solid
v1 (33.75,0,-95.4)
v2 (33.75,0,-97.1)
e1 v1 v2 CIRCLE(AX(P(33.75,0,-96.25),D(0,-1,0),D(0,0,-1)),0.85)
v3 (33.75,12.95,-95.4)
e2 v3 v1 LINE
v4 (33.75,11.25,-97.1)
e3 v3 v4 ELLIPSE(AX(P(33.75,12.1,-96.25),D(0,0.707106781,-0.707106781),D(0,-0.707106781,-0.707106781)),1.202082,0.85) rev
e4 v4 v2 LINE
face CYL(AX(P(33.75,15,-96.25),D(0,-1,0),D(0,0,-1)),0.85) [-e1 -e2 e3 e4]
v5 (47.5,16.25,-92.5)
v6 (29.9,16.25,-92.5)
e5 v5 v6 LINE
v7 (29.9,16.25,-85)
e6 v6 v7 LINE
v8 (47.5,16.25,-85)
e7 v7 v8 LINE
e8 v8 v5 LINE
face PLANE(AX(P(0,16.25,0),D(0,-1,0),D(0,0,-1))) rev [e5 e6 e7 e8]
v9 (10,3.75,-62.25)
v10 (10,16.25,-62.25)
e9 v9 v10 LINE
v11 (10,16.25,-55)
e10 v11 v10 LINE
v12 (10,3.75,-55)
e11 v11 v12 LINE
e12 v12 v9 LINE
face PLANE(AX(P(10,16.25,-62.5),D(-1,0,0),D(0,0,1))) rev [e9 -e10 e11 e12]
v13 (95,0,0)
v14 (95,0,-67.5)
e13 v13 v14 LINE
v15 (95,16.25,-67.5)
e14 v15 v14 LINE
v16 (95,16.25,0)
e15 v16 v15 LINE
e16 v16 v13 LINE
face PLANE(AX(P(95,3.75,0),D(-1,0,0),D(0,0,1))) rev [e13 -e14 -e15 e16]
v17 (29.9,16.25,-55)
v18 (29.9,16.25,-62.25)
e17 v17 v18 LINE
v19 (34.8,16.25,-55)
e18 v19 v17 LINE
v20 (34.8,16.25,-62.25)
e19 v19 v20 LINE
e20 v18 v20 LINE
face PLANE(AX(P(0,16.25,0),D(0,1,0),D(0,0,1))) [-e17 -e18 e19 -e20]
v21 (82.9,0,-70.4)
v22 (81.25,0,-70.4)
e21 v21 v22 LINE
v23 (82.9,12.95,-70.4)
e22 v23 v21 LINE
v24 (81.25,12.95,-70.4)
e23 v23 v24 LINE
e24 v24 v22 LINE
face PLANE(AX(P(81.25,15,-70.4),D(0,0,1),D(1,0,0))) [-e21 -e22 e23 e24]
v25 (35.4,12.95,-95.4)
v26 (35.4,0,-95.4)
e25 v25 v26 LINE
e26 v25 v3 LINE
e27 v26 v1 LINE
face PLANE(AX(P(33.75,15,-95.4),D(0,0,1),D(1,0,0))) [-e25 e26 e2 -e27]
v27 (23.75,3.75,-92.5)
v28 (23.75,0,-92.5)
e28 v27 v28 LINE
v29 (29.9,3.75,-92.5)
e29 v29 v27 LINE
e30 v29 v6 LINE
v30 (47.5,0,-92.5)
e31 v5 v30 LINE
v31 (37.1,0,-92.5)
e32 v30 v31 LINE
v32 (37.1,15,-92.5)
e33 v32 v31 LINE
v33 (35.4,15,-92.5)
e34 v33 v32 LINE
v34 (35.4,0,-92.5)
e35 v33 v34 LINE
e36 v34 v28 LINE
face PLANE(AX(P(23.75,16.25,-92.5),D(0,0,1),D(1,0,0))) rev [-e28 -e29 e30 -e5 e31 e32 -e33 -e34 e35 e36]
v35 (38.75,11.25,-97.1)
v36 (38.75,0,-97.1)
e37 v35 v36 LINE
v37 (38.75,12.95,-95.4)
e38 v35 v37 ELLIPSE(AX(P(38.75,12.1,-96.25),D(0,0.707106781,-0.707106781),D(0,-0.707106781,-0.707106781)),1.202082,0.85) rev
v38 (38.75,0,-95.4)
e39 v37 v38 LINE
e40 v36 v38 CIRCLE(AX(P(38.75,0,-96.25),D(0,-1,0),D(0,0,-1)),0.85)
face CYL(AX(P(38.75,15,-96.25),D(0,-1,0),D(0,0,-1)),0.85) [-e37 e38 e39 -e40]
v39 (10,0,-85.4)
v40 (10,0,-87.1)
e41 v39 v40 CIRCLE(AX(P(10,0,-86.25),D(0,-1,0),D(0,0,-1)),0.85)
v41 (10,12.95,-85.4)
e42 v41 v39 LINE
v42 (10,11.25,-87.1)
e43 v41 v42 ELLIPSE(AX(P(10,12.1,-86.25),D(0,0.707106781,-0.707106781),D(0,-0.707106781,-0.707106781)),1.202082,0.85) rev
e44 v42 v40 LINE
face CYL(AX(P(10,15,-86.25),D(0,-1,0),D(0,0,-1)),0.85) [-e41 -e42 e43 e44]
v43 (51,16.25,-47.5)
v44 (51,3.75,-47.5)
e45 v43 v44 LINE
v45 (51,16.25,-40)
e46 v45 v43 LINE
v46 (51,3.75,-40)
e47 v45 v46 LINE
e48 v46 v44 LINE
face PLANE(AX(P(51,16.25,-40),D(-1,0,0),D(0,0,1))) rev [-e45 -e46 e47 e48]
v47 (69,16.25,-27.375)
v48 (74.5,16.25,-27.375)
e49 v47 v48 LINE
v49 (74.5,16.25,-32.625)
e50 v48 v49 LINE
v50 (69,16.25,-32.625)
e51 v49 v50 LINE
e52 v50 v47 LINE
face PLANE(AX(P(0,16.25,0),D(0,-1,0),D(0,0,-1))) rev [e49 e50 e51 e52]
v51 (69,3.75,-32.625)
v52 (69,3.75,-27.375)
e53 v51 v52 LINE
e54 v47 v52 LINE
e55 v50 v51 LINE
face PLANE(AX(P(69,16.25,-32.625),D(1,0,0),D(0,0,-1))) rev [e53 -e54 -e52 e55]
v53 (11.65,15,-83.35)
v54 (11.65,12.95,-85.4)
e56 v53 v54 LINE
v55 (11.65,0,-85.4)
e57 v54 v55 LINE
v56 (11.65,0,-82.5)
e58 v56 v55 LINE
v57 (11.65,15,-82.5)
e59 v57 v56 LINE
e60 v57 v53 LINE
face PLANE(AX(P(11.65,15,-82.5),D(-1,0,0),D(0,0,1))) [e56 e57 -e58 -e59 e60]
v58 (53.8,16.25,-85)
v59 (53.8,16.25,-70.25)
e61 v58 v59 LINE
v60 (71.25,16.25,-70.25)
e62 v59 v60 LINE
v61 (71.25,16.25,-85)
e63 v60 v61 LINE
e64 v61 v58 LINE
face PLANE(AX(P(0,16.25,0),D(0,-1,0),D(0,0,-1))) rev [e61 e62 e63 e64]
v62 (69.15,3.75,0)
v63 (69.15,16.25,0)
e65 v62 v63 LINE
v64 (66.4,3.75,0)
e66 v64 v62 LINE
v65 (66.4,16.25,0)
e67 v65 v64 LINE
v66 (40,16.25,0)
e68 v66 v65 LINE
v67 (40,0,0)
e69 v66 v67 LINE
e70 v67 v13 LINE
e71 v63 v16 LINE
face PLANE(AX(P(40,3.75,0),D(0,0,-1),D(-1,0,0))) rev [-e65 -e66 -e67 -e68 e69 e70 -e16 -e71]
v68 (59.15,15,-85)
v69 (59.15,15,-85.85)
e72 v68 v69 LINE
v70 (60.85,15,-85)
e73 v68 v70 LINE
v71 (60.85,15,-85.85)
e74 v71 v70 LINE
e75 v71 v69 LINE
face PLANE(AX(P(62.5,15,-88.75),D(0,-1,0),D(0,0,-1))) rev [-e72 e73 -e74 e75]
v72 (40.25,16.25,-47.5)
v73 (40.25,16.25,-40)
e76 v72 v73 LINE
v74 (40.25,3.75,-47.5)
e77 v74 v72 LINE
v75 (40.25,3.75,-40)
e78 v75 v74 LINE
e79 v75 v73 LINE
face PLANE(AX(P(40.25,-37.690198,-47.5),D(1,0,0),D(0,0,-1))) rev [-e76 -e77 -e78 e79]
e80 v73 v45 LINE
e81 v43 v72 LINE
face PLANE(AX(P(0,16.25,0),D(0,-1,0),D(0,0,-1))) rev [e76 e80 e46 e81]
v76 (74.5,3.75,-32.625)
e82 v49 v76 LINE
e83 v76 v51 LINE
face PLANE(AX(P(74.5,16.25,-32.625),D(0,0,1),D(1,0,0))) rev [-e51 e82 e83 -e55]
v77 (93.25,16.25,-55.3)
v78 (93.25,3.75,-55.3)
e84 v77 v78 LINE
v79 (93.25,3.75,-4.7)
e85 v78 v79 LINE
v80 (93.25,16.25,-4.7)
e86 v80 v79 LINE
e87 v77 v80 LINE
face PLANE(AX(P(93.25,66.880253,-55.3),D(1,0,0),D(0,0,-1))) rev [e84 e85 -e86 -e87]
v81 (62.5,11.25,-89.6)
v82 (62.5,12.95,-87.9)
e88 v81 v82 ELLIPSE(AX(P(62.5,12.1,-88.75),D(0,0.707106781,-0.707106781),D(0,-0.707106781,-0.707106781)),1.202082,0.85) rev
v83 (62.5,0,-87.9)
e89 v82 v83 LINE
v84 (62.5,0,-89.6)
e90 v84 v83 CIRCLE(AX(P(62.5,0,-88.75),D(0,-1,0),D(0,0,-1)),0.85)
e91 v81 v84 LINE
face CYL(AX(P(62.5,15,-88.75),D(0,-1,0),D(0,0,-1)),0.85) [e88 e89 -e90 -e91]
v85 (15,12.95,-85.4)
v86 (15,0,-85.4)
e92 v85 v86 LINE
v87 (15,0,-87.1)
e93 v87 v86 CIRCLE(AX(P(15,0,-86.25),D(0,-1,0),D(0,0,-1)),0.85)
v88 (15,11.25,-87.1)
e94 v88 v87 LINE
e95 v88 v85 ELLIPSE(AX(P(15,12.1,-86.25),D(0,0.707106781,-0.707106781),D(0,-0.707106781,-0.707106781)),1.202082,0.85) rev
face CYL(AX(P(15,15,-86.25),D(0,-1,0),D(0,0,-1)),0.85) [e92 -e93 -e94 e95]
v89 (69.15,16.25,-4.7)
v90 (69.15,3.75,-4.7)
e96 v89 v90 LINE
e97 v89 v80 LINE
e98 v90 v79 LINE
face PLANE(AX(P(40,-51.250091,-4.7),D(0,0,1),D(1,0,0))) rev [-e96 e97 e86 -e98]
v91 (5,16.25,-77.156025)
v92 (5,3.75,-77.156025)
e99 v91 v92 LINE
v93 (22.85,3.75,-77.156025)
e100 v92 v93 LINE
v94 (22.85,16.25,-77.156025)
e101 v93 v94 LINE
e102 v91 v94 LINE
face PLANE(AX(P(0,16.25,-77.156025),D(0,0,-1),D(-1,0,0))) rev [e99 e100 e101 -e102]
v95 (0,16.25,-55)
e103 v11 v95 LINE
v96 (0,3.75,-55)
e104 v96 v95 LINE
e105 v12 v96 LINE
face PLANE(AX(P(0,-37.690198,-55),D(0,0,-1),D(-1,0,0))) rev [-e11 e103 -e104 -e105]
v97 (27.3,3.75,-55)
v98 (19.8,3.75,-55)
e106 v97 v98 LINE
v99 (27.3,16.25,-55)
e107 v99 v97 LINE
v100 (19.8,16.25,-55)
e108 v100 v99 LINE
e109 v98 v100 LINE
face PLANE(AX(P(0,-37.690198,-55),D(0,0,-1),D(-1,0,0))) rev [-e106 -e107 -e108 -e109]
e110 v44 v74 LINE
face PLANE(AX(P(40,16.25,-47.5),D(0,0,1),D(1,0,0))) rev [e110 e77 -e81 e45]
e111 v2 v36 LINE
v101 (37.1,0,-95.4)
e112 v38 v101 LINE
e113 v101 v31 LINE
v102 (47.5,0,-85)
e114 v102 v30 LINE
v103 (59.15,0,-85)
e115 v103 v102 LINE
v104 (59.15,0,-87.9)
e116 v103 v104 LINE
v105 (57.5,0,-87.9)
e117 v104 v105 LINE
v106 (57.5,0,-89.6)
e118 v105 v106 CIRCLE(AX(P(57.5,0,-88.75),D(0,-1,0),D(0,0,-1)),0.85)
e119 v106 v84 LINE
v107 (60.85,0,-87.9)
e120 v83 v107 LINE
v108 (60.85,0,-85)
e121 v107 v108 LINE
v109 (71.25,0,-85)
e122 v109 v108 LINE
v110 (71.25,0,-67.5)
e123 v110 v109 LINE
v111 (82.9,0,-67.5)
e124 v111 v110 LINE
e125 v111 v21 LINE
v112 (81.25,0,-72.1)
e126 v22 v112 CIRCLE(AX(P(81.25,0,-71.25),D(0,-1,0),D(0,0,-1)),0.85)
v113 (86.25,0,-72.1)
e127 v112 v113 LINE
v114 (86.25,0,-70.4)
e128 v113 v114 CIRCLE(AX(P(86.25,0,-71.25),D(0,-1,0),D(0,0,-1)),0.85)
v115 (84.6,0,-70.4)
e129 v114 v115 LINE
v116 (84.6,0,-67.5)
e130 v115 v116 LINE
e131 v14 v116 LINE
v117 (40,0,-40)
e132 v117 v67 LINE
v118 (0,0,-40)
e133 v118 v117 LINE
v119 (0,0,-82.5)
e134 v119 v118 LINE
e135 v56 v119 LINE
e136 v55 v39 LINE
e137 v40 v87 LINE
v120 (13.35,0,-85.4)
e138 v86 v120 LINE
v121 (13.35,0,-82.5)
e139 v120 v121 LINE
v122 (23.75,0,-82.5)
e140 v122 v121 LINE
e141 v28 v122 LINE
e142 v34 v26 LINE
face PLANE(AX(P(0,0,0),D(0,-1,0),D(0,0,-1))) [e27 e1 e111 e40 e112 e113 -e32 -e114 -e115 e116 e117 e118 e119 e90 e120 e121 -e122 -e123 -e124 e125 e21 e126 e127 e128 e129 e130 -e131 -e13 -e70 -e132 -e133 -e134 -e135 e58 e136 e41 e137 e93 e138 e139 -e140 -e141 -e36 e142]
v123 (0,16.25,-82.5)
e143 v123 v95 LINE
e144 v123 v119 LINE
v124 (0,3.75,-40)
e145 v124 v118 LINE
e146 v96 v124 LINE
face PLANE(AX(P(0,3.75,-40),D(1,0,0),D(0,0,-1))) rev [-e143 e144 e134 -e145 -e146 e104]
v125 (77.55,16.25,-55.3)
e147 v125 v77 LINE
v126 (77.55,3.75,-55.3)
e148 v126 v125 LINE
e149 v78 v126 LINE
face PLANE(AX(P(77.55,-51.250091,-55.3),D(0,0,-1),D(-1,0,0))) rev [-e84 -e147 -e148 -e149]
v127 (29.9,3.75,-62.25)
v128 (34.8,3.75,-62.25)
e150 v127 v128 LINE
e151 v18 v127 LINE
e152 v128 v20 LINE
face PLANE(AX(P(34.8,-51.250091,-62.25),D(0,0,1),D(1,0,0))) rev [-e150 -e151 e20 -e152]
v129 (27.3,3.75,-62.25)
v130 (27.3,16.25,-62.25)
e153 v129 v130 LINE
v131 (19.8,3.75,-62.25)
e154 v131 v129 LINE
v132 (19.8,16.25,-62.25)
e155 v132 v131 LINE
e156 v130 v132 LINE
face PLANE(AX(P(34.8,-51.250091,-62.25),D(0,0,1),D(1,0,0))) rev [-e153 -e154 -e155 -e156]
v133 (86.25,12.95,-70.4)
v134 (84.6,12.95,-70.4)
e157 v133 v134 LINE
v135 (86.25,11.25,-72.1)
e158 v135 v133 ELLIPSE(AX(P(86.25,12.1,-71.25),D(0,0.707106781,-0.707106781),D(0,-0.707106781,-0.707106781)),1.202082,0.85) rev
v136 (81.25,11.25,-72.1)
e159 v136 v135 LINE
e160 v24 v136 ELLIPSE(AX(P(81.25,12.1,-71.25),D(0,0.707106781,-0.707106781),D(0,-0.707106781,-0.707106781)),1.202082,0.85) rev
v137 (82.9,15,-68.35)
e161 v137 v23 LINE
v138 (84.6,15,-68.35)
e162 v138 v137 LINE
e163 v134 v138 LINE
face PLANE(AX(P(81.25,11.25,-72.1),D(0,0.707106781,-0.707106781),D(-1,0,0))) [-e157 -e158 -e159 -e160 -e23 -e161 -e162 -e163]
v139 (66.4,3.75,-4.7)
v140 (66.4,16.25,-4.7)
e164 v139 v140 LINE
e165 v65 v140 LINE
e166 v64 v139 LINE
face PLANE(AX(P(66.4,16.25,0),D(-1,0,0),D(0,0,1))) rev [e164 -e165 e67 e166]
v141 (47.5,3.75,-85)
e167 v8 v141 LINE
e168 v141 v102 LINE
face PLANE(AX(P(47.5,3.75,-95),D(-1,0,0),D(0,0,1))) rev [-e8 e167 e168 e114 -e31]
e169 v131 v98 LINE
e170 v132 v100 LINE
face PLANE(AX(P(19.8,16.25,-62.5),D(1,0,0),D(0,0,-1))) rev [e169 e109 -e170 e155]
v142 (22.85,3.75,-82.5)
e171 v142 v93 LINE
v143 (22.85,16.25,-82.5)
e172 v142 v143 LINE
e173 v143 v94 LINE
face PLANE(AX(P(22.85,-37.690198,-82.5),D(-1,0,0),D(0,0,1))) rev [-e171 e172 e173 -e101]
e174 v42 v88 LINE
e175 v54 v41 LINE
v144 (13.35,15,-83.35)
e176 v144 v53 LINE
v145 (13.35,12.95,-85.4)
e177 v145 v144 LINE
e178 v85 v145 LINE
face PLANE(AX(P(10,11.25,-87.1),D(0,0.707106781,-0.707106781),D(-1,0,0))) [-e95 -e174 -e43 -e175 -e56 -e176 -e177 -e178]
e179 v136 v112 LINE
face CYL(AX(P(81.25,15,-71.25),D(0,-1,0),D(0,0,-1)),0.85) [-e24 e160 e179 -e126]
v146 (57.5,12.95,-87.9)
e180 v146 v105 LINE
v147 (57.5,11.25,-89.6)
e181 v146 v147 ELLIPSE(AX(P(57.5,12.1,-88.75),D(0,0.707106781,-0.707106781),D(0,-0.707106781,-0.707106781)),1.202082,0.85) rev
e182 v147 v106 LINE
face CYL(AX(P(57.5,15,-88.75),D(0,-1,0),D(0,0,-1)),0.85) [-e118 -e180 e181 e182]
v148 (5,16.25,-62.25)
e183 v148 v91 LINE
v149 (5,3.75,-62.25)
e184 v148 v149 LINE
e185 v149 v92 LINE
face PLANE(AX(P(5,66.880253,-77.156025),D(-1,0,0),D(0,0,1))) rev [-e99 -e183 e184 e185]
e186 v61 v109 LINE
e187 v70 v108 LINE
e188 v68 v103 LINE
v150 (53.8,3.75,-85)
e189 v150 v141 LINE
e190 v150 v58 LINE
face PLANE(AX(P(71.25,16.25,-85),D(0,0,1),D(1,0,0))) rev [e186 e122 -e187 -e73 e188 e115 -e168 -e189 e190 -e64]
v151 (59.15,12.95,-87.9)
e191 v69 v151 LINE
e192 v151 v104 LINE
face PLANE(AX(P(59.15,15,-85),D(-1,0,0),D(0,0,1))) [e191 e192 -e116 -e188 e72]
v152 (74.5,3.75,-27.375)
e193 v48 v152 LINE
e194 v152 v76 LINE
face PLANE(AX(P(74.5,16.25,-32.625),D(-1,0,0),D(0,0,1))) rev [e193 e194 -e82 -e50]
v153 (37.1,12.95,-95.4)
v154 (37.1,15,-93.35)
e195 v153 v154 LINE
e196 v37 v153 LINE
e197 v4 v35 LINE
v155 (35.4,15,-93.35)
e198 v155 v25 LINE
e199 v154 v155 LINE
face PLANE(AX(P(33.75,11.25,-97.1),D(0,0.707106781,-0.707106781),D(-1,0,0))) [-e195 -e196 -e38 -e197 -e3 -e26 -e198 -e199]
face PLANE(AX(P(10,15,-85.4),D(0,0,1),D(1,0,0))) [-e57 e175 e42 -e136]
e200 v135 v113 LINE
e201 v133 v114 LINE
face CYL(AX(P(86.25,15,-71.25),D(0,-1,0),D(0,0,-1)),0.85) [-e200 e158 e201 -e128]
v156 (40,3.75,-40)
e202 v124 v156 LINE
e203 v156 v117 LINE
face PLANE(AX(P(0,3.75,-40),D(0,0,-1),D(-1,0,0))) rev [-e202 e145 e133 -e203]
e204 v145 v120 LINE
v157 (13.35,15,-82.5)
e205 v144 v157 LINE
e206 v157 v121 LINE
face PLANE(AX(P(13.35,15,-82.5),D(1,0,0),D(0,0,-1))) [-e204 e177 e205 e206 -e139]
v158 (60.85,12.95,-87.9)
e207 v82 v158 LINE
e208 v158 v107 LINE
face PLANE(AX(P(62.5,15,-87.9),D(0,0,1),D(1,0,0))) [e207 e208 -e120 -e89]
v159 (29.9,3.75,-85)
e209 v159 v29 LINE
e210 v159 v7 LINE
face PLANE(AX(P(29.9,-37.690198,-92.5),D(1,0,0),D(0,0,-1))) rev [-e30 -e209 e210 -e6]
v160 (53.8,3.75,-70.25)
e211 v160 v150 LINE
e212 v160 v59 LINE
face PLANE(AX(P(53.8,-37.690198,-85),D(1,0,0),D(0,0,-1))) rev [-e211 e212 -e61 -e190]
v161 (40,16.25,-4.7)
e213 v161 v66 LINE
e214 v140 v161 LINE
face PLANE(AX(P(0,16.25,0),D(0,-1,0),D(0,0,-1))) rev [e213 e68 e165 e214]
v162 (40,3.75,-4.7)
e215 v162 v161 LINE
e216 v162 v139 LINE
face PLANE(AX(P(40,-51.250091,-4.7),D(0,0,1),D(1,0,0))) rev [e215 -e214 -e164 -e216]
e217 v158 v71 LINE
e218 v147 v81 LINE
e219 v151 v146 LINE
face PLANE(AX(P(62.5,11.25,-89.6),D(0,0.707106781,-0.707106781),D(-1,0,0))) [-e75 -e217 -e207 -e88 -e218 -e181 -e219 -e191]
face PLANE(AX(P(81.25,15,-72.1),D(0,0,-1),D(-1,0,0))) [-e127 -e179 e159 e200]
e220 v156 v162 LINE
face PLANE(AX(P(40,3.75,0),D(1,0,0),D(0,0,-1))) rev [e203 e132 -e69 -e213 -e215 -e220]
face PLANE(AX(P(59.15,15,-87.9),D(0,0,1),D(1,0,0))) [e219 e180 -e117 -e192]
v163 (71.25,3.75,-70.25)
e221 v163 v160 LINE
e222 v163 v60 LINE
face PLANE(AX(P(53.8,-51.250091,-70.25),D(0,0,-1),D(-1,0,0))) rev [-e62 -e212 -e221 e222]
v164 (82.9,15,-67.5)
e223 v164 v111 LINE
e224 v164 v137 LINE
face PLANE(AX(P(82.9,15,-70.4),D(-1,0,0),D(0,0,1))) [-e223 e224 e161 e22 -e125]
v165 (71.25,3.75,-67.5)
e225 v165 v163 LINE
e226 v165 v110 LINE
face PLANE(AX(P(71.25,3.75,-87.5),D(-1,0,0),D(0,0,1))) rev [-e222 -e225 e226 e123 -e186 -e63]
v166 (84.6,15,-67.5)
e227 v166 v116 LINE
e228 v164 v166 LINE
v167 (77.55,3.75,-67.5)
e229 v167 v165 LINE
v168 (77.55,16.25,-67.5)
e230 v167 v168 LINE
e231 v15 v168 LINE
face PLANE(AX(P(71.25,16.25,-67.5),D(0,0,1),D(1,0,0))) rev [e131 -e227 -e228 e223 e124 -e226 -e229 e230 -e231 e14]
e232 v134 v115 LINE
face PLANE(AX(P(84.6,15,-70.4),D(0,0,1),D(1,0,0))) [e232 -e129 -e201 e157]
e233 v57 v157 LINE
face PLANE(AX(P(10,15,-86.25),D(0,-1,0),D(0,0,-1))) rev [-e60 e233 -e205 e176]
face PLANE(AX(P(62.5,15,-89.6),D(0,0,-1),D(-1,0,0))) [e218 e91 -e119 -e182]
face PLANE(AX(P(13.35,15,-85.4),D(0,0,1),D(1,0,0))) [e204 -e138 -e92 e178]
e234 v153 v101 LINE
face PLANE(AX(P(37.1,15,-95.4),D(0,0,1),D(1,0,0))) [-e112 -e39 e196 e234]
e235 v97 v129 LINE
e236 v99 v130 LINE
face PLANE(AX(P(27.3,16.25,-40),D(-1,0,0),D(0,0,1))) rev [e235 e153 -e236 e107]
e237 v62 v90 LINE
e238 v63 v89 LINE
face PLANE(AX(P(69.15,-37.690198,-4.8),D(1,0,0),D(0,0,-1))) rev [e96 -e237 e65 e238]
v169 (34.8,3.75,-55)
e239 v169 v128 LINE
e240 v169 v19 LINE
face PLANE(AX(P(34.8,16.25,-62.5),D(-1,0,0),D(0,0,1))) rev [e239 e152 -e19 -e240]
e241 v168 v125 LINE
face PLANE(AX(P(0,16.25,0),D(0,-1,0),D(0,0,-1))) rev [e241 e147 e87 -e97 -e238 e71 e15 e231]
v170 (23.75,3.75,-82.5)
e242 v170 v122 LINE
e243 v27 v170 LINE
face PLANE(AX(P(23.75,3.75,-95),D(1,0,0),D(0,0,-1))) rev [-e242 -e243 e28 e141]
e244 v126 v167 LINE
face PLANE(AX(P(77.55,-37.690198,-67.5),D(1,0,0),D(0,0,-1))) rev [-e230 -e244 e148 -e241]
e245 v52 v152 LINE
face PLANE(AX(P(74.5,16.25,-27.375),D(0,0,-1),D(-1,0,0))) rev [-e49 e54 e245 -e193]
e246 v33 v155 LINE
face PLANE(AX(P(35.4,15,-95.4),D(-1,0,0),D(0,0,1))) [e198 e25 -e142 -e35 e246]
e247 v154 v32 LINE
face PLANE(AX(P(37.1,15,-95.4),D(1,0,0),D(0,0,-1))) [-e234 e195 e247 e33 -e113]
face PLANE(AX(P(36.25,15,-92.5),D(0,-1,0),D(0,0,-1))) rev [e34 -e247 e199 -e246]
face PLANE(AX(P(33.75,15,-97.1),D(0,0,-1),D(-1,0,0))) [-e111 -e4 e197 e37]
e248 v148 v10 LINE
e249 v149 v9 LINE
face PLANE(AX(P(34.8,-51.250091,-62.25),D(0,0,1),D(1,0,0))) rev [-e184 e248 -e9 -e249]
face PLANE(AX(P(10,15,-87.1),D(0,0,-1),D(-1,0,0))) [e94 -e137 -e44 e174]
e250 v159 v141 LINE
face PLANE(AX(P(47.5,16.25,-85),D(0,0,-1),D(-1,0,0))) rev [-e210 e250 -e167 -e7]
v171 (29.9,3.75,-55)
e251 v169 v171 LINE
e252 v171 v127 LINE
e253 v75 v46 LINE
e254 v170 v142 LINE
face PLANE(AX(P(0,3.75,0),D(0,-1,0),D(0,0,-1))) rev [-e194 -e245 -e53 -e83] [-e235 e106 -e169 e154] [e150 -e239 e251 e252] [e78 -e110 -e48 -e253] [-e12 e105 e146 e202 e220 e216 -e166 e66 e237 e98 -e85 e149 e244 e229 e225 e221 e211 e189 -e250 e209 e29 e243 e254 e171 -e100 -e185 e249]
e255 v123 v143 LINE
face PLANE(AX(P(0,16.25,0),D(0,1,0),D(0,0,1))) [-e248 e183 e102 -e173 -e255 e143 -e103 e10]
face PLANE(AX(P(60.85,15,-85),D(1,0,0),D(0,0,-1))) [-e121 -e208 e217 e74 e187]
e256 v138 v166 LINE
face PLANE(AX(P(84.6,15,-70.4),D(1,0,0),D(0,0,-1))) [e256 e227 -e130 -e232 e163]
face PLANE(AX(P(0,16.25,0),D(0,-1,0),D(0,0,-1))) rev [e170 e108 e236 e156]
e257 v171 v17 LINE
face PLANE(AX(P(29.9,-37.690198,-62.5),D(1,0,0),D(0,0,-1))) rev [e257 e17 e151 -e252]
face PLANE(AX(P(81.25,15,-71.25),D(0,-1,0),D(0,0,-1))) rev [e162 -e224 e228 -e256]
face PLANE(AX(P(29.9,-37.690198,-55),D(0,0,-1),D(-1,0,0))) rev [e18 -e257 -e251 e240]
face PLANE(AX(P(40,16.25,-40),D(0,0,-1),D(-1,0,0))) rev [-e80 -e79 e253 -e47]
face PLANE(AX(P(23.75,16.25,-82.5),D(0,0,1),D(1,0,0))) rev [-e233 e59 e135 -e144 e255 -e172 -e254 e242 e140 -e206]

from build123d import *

# Parameters (mm, degrees)
BOSS_EXTRUDE1_DEPTH     = 3.75
SKETCH2_W               = 17.7
SKETCH2_H               = 14.8
SKETCH2_H_2             = 17.5
SKETCH2_W_2             = 7.5
SKETCH2_H_3             = 22.5
SKETCH2_H_4             = 10
SKETCH2_W_3             = 26.4
SKETCH2_H_5             = 4.8
SKETCH2_W_4             = 11
SKETCH2_H_6             = 7.5
SKETCH2_W_5             = 10
SKETCH2_W_6             = 23.1
SKETCH2_H_7             = 7.843975032
SKETCH2_W_7             = 26.1
SKETCH2_W_8             = 5
SKETCH2_W_9             = 5.5
SKETCH2_H_8             = 5.25
BOSS_EXTRUDE2_DEPTH     = 12.5
SKETCH5_W               = 23.75
SKETCH5_H               = 2.5
CUT_EXTRUDE2_DEPTH      = 136.329459099
BOSS_EXTRUDE3_DEPTH     = 15
CHAMFER1_SIZE           = 3.75
CUT_EXTRUDE3_DEPTH      = 137.811814183
CUT_EXTRUDE3_DEPTH_BACK = 12.5
SKETCH7_W               = 0.25
SKETCH7_H               = 5.343975032
SKETCH7_W_2             = 0.1
SKETCH7_H_2             = 7.5
SKETCH7_H_3             = 15
SKETCH7_H_4             = 12.3
SKETCH7_H_5             = 4.8
CUT_EXTRUDE4_DEPTH      = 137.811814183
CUT_EXTRUDE4_DEPTH_BACK = 12.5
SKETCH9_W               = 17.45
SKETCH9_H               = 0.1
SKETCH9_H_2             = 0.25
SKETCH9_W_2             = 34.8
SKETCH9_W_3             = 55
SKETCH10_W              = 1.75
SKETCH10_H              = 50.6
SKETCH10_W_2            = 5
SKETCH10_H_2            = 14.906024968
BOSS_EXTRUDE5_DEPTH     = 12.5


with BuildPart() as part:
    # Sketch1 → Boss-Extrude1 (new body)
    with BuildSketch(Plane(origin=(0, 0, 0), x_dir=(1, 0, 0), z_dir=(0, 1, 0))):
        Polygon((40, 0), (95, 0), (95, 70), (71.25, 70), (71.25, 87.5), (47.5, 87.5), (47.5, 95), (23.75, 95), (23.75, 85), (0, 85), (0, 40), (40, 40), align=None)
    extrude(amount=BOSS_EXTRUDE1_DEPTH)

    # Sketch2 → Boss-Extrude2 (add)
    with BuildSketch(Plane(origin=(0, 3.75, 0), x_dir=(1, 0, 0), z_dir=(0, 1, 0))):
        with Locations((86.15, 62.6)):
            Rectangle(SKETCH2_W, SKETCH2_H)
        with Locations((62.4, 78.75)):
            Rectangle(SKETCH2_W, SKETCH2_H_2)
        with Locations((23.55, 51.25)):
            Rectangle(SKETCH2_W_2, SKETCH2_H_3)
        with Locations((38.65, 90)):
            Rectangle(SKETCH2_W, SKETCH2_H_4)
        with Locations((53.2, 2.4)):
            Rectangle(SKETCH2_W_3, SKETCH2_H_5)
        with Locations((45.5, 43.75)):
            Rectangle(SKETCH2_W_4, SKETCH2_H_6)
        with Locations((5, 51.25)):
            Rectangle(SKETCH2_W_5, SKETCH2_H_3)
        with Locations((11.55, 81.078012484)):
            Rectangle(SKETCH2_W_6, SKETCH2_H_7)
        with Locations((81.95, 2.4)):
            Rectangle(SKETCH2_W_7, SKETCH2_H_5)
        with Locations((32.3, 51.25)):
            Rectangle(SKETCH2_W_8, SKETCH2_H_3)
        with Locations((71.75, 30)):
            Rectangle(SKETCH2_W_9, SKETCH2_H_8)
    extrude(amount=BOSS_EXTRUDE2_DEPTH)

    # Sketch5 → Cut-Extrude2 (cut, through all)
    with BuildSketch(Plane.XZ):
        with Locations((11.875, -83.75)):
            Rectangle(SKETCH5_W, SKETCH5_H)
        with Locations((59.375, -86.25)):
            Rectangle(SKETCH5_W, SKETCH5_H)
        with Locations((35.625, -93.75)):
            Rectangle(SKETCH5_W, SKETCH5_H)
        with Locations((83.125, -68.75)):
            Rectangle(SKETCH5_W, SKETCH5_H)
    extrude(amount=-CUT_EXTRUDE2_DEPTH, mode=Mode.SUBTRACT)

    # Sketch6 → Boss-Extrude3 (add)
    with BuildSketch(Plane.XZ):
        with BuildLine():
            Line((59.15, -87.9), (57.5, -87.9))
            ThreePointArc((57.5, -87.9), (56.65, -88.75), (57.5, -89.6))
            Line((57.5, -89.6), (62.5, -89.6))
            ThreePointArc((62.5, -89.6), (63.35, -88.75), (62.5, -87.9))
            Line((62.5, -87.9), (60.85, -87.9))
            Line((60.85, -87.9), (60.85, -85))
            ThreePointArc((60.85, -85), (60, -84.15), (59.15, -85))
            Line((59.15, -85), (59.15, -87.9))
        make_face()
        with BuildLine():
            Line((37.1, -95.4), (38.75, -95.4))
            ThreePointArc((38.75, -95.4), (39.6, -96.25), (38.75, -97.1))
            Line((38.75, -97.1), (33.75, -97.1))
            ThreePointArc((33.75, -97.1), (32.9, -96.25), (33.75, -95.4))
            Line((33.75, -95.4), (35.4, -95.4))
            Line((35.4, -95.4), (35.4, -92.5))
            ThreePointArc((35.4, -92.5), (36.25, -91.65), (37.1, -92.5))
            Line((37.1, -92.5), (37.1, -95.4))
        make_face()
        with BuildLine():
            Line((13.35, -85.4), (15, -85.4))
            ThreePointArc((15, -85.4), (15.85, -86.25), (15, -87.1))
            Line((15, -87.1), (10, -87.1))
            ThreePointArc((10, -87.1), (9.15, -86.25), (10, -85.4))
            Line((10, -85.4), (11.65, -85.4))
            Line((11.65, -85.4), (11.65, -82.5))
            ThreePointArc((11.65, -82.5), (12.5, -81.65), (13.35, -82.5))
            Line((13.35, -82.5), (13.35, -85.4))
        make_face()
        with BuildLine():
            Line((81.25, -70.4), (82.9, -70.4))
            Line((82.9, -70.4), (82.9, -67.5))
            ThreePointArc((82.9, -67.5), (83.75, -66.65), (84.6, -67.5))
            Line((84.6, -67.5), (84.6, -70.4))
            Line((84.6, -70.4), (86.25, -70.4))
            ThreePointArc((86.25, -70.4), (87.1, -71.25), (86.25, -72.1))
            Line((86.25, -72.1), (81.25, -72.1))
            ThreePointArc((81.25, -72.1), (80.4, -71.25), (81.25, -70.4))
        make_face()
    extrude(amount=-BOSS_EXTRUDE3_DEPTH)

    # Chamfer1
    # the kernel refuses this chamfer: 3.75 mm, written as the material it takes off along each edge
    with BuildSketch(Plane(origin=(47.856188795, 15, -89.6), x_dir=(0, 0.027495876610586334, 0.9996219169112968), z_dir=(1, 0, 0))) as chamfer1_piece_1:
        Polygon((CHAMFER1_SIZE * 0.999621916911, CHAMFER1_SIZE * 0.0274958766106), (-CHAMFER1_SIZE * 0.0274958766106, CHAMFER1_SIZE * 0.999621916911), (0, 0), align=None)
    extrude(amount=24.28762241, mode=Mode.SUBTRACT)
    with BuildSketch(Plane(origin=(48.393811205, 15, -97.1), x_dir=(0, 0.027495876610586334, 0.9996219169112968), z_dir=(-1, 0, 0)), Plane(origin=(95.893811205, 15, -72.1), x_dir=(0, 0.027495876610586334, 0.9996219169112968), z_dir=(-1, 0, 0)), Plane(origin=(24.643811205, 15, -87.1), x_dir=(0, 0.027495876610586334, 0.9996219169112968), z_dir=(-1, 0, 0))) as chamfer1_piece_2:
        Polygon((CHAMFER1_SIZE * 0.999621916911, -CHAMFER1_SIZE * 0.0274958766106), (-CHAMFER1_SIZE * 0.0274958766106, -CHAMFER1_SIZE * 0.999621916911), (0, 0), align=None)
    extrude(amount=24.28762241, mode=Mode.SUBTRACT)

    # Sketch7 → Cut-Extrude3 (cut, two sides: drawn at the far end of the back side and taken through both)
    with BuildSketch(Plane(origin=(0, 16.25, 0), x_dir=(1, 0, 0), z_dir=(0, 1, 0)).offset(-CUT_EXTRUDE3_DEPTH_BACK)):
        with Locations((22.975, 79.828012484)):
            Rectangle(SKETCH7_W, SKETCH7_H)
        with Locations((29.85, 88.75)):
            Rectangle(SKETCH7_W_2, SKETCH7_H_2)
        Polygon((29.8, 62.5), (29.9, 62.5), (29.9, 55), (34.8, 55), (34.8, 40), (0, 40), (0, 55), (29.8, 55), align=None)
        with Locations((53.675, 77.5)):
            Rectangle(SKETCH7_W, SKETCH7_H_3)
        with Locations((40.125, 43.75)):
            Rectangle(SKETCH7_W, SKETCH7_H_2)
        with Locations((77.425, 61.35)):
            Rectangle(SKETCH7_W, SKETCH7_H_4)
        with Locations((69.025, 2.4)):
            Rectangle(SKETCH7_W, SKETCH7_H_5)
    extrude(amount=CUT_EXTRUDE3_DEPTH + CUT_EXTRUDE3_DEPTH_BACK, mode=Mode.SUBTRACT)

    # Sketch9 → Cut-Extrude4 (cut, two sides: drawn at the far end of the back side and taken through both)
    with BuildSketch(Plane(origin=(0, 16.25, 0), x_dir=(1, 0, 0), z_dir=(0, 1, 0)).offset(-CUT_EXTRUDE4_DEPTH_BACK)):
        with Locations((86.275, 55.25)):
            Rectangle(SKETCH9_W, SKETCH9_H)
        with Locations((62.525, 70.125)):
            Rectangle(SKETCH9_W, SKETCH9_H_2)
        with Locations((17.4, 62.375)):
            Rectangle(SKETCH9_W_2, SKETCH9_H_2)
        with Locations((67.5, 4.75)):
            Rectangle(SKETCH9_W_3, SKETCH9_H)
    extrude(amount=CUT_EXTRUDE4_DEPTH + CUT_EXTRUDE4_DEPTH_BACK, mode=Mode.SUBTRACT)

    # Sketch10 → Boss-Extrude5 (add)
    with BuildSketch(Plane(origin=(0, 3.75, 0), x_dir=(1, 0, 0), z_dir=(0, 1, 0))):
        with Locations((94.125, 30)):
            Rectangle(SKETCH10_W, SKETCH10_H)
        with Locations((2.5, 69.703012484)):
            Rectangle(SKETCH10_W_2, SKETCH10_H_2)
    extrude(amount=BOSS_EXTRUDE5_DEPTH)


solid = part.part
